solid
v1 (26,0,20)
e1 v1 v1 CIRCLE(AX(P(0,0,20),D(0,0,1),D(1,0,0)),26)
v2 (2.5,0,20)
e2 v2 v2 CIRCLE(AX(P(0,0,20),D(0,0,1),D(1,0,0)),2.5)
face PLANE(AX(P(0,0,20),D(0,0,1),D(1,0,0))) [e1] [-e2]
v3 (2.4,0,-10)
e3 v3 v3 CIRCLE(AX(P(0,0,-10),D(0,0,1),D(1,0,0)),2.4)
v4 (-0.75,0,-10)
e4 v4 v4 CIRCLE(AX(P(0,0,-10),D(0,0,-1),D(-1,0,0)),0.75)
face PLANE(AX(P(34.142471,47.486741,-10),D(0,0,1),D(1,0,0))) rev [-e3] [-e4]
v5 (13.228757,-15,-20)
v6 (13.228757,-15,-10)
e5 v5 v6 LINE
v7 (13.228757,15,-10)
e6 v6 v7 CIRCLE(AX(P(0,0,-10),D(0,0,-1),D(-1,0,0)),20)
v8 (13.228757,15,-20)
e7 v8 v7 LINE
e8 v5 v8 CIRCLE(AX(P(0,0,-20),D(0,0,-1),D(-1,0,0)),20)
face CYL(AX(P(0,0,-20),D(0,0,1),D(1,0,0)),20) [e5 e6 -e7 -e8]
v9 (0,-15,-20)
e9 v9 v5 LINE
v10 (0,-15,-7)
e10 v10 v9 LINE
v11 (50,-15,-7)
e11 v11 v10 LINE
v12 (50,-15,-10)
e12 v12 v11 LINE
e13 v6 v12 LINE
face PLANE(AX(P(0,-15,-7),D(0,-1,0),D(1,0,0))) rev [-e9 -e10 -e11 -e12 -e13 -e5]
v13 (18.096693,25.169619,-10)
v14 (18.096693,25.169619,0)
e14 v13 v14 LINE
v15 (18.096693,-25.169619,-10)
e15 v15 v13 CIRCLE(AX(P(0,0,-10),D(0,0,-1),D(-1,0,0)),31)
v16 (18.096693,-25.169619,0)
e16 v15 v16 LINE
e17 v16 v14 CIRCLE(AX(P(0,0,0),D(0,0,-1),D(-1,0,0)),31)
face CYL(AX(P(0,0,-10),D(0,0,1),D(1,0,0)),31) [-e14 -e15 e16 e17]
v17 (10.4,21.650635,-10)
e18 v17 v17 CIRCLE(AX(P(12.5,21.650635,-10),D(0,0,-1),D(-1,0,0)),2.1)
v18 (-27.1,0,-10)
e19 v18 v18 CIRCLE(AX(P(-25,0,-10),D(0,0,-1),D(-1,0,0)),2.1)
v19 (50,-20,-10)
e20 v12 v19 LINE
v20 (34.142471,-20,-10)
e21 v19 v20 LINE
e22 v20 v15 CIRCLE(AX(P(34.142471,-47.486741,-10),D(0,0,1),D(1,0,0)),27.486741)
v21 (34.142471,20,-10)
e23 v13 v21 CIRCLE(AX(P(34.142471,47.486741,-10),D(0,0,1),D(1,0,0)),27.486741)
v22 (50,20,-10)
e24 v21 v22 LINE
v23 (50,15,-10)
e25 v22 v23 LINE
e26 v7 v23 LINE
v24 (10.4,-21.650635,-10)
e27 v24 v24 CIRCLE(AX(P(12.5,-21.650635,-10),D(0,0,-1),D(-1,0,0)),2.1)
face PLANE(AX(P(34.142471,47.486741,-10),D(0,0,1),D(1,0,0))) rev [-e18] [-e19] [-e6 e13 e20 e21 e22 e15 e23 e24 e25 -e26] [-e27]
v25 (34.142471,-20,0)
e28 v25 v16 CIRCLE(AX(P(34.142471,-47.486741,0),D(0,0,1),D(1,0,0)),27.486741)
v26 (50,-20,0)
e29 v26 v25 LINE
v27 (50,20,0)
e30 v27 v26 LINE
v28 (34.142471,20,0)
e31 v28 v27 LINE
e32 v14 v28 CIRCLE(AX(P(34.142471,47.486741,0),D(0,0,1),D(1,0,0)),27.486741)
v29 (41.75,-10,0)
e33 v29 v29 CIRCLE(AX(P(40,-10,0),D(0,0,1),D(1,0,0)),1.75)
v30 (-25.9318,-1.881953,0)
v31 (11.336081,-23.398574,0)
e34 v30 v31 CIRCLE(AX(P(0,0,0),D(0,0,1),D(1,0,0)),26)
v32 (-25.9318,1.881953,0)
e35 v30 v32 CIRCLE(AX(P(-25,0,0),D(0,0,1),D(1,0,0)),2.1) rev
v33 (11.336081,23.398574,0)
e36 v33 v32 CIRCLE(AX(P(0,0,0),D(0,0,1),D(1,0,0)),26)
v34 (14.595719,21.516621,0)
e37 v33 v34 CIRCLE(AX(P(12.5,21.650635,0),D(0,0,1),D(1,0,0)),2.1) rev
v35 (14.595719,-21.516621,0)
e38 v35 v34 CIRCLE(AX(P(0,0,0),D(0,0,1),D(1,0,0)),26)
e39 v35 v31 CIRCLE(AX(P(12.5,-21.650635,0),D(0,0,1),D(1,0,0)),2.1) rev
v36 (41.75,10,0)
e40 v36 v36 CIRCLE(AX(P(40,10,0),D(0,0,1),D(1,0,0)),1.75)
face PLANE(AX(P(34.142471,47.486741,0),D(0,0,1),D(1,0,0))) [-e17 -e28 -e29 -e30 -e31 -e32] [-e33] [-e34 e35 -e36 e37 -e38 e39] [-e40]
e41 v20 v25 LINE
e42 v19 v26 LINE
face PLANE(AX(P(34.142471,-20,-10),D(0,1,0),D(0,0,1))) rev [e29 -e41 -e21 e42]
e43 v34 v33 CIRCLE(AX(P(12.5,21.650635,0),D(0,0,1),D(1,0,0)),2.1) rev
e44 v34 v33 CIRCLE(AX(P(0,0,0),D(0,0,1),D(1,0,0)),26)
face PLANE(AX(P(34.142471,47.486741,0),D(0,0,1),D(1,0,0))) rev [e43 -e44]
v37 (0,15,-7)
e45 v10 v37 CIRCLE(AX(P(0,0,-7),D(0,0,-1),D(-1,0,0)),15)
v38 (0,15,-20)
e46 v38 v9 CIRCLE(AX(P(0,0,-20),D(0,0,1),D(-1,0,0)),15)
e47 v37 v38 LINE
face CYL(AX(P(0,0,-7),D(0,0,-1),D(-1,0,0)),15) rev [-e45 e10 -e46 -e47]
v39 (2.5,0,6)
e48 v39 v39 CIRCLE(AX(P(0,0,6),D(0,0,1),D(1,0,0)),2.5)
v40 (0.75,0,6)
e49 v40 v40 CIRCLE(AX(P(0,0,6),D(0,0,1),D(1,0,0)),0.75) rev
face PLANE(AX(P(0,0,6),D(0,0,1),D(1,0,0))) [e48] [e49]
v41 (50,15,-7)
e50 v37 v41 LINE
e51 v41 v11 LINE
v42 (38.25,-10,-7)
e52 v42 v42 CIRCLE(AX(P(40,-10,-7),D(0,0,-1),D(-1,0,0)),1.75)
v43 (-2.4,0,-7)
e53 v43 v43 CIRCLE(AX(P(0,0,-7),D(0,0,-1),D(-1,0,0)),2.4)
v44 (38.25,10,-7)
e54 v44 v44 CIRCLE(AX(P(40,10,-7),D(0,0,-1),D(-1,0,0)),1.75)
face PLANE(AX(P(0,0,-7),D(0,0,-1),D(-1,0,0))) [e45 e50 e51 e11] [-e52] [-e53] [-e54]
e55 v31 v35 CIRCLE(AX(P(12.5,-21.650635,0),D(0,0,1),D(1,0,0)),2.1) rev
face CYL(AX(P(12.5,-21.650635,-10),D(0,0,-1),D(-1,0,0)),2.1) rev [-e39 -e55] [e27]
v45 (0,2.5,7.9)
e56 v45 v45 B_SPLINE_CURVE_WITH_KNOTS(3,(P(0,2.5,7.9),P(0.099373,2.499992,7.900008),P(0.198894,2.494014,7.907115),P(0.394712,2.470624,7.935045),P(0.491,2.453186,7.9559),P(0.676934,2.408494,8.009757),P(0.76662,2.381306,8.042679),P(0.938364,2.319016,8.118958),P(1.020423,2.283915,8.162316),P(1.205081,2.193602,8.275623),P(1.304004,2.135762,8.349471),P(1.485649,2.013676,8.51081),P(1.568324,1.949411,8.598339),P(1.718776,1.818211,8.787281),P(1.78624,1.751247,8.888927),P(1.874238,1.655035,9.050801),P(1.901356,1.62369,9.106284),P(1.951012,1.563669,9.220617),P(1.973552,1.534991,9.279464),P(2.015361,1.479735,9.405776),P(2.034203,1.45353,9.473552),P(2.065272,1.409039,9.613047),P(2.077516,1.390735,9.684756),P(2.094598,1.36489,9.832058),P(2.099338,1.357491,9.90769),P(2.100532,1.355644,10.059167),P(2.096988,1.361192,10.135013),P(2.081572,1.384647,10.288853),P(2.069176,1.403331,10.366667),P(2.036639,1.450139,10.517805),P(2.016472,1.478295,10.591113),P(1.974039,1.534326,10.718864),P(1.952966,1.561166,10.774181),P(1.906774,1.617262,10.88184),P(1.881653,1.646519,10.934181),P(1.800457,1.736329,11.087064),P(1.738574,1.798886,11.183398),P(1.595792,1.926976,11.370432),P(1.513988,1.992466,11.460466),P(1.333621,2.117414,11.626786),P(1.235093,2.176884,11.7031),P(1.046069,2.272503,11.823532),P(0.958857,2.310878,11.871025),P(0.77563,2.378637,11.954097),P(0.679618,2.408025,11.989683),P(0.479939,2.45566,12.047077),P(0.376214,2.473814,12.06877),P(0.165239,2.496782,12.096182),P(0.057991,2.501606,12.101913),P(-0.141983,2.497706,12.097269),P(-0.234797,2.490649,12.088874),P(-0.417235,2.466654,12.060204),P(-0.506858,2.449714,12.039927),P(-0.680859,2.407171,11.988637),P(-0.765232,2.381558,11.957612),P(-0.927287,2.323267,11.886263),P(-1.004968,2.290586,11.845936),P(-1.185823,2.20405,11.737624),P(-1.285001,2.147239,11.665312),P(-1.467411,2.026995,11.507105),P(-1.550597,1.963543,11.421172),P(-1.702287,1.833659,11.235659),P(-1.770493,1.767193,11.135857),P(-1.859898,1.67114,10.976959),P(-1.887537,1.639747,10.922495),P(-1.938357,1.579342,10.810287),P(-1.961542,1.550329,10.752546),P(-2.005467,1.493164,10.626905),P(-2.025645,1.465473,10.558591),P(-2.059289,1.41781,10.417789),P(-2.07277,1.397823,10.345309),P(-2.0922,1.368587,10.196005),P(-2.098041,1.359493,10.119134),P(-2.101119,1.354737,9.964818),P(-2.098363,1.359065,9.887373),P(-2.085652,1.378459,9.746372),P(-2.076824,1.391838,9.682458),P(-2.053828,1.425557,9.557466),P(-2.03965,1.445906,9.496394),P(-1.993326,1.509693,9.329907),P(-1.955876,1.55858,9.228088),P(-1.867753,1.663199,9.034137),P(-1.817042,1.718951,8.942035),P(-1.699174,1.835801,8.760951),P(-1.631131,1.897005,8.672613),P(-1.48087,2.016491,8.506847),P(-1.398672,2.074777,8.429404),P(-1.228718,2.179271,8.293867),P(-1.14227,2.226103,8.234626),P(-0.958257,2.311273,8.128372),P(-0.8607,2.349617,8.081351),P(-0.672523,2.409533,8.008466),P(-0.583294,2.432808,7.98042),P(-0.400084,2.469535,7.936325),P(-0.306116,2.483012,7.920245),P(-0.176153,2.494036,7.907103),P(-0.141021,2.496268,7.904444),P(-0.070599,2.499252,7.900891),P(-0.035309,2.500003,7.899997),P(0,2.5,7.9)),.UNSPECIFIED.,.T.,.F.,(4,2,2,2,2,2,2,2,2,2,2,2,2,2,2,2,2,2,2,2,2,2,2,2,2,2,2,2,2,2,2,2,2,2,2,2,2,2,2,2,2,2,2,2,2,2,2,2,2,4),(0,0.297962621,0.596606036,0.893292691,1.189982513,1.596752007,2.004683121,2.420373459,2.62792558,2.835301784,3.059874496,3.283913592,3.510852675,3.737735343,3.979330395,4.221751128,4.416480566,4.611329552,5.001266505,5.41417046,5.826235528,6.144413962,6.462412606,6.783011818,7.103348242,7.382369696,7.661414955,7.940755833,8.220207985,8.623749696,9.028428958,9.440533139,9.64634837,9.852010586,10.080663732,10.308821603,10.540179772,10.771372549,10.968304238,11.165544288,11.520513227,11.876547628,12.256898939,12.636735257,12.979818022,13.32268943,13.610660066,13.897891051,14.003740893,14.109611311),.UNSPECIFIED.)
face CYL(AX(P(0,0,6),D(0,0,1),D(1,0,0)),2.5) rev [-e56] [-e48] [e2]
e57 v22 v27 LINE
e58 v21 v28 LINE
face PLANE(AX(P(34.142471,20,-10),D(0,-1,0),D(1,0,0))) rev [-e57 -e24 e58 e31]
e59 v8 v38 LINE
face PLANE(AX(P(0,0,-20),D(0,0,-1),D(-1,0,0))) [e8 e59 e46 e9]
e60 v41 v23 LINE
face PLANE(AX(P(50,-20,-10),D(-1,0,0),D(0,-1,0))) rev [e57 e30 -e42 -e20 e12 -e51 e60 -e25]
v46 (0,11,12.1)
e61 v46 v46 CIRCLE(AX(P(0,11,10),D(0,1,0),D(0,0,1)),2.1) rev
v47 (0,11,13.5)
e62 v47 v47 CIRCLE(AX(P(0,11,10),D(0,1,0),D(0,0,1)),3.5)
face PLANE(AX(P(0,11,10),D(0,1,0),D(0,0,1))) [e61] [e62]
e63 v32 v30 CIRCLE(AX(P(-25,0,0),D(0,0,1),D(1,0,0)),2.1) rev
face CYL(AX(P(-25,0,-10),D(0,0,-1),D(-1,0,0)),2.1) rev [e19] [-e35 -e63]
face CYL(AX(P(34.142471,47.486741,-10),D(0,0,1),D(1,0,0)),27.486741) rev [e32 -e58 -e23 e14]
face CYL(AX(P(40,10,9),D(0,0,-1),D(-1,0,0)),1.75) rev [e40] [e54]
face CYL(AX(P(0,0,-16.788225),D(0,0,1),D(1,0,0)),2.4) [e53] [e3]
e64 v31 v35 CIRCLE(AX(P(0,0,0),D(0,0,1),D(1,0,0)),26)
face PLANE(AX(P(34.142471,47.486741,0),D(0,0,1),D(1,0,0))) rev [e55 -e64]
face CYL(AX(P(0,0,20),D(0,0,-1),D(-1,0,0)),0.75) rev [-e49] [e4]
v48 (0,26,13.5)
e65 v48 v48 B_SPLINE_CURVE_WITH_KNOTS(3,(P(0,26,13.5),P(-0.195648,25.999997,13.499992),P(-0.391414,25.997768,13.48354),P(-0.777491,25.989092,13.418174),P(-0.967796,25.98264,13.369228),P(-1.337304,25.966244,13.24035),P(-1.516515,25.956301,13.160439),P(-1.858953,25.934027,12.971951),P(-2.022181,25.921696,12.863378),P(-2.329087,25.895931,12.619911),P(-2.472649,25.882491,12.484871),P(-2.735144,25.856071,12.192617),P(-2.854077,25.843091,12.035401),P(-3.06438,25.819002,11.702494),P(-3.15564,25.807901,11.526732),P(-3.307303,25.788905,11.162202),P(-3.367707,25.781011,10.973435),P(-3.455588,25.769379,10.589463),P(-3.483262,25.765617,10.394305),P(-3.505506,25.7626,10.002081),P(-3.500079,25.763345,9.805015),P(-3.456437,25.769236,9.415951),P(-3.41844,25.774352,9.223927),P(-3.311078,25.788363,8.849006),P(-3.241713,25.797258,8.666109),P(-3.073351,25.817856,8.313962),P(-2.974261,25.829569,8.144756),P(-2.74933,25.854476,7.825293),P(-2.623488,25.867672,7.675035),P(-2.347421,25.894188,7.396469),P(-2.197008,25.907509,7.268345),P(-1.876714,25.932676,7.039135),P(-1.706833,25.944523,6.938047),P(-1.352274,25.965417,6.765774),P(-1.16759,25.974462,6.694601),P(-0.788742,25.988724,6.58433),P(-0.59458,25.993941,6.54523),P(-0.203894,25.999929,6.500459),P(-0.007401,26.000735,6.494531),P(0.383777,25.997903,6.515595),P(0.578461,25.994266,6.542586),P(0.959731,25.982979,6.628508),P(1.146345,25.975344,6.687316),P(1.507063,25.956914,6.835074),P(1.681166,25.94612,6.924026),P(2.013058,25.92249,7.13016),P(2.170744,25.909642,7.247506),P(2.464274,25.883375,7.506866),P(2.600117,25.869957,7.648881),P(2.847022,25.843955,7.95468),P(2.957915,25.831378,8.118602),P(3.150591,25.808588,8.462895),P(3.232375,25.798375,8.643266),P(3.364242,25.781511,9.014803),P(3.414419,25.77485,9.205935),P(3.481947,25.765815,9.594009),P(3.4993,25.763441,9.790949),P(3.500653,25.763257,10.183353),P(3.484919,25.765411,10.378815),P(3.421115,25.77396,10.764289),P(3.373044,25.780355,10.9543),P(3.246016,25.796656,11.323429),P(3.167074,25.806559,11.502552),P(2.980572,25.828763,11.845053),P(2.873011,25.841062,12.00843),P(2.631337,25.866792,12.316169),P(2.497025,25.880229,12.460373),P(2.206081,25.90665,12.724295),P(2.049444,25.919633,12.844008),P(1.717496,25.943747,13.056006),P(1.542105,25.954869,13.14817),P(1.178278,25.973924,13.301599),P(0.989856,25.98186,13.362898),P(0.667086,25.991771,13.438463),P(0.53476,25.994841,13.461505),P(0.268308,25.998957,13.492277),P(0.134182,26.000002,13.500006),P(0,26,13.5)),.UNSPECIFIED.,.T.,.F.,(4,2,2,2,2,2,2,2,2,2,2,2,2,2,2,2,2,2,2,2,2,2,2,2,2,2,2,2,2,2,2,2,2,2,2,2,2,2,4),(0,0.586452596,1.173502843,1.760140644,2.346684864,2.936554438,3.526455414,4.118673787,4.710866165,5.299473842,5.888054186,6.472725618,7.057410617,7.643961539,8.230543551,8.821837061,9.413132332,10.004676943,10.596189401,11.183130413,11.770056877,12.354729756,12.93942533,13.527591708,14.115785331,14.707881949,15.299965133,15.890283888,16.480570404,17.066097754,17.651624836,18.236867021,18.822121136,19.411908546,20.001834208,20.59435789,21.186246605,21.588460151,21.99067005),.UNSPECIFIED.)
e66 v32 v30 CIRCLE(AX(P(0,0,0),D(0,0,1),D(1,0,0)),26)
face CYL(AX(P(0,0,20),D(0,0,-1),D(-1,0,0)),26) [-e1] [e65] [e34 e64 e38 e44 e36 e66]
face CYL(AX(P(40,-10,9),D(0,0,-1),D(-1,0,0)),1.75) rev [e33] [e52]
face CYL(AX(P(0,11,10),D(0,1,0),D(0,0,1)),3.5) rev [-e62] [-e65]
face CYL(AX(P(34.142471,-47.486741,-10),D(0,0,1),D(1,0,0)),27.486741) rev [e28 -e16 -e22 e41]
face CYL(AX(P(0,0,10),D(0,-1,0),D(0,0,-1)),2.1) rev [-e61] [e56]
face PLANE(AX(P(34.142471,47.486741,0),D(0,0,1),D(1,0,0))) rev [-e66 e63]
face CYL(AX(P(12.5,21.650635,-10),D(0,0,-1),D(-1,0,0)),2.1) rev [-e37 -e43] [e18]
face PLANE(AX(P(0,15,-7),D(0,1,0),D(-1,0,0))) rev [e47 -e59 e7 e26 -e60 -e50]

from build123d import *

# Parameters (mm, degrees)
SKETCH1_R                     = 26
BOSS_EXTRUDE1_DEPTH           = 20
SKETCH2_W                     = 2.1
SKETCH2_H                     = 26
SKETCH4_R                     = 3.5
CUT_EXTRUDE1_DEPTH            = 15
BOSS_EXTRUDE2_DEPTH           = 10
CUT_EXTRUDE2_DEPTH            = 3
SKETCH7_R                     = 2.4
BOSS_EXTRUDE3_DEPTH           = 3
SKETCH8_R                     = 0.75
CUT_EXTRUDE3_DEPTH            = 67.03786797
SKETCH9_R                     = 2.5
CUT_EXTRUDE4_DEPTH            = 14
SKETCH10_R                    = 1.75
CUT_EXTRUDE5_DEPTH            = 16
BOSS_EXTRUDE4_START           = 10
BOSS_EXTRUDE4_DEPTH           = 10
M5X0_8_START                  = -10
M5X0_8_TAPPED_HOLE2_OUTLINE_R = 2.1
M5X0_8_TAPPED_HOLE2_DEPTH     = 10
CIRPATTERN1_COUNT             = 3


# Read off the part's stored shape, not the designer's step: M5x0.8 Tapped Hole2
with BuildPart() as part:
    # Sketch1 → Boss-Extrude1 (new body)
    with BuildSketch(Plane.XY):
        Circle(SKETCH1_R)
    extrude(amount=BOSS_EXTRUDE1_DEPTH)

    # Sketch2 → M5x0.8 Tapped Hole1 (revolve, cut)
    with BuildSketch(Plane(origin=(0, 0, 10), x_dir=(0, 0, -1), z_dir=(1, 0, 0))):
        with Locations((1.05, 13)):
            Rectangle(SKETCH2_W, SKETCH2_H)
    revolve(axis=Axis((0, -6.35, 10), (0, 1, 0)), mode=Mode.SUBTRACT)

    # Sketch4 → Cut-Extrude1 (cut)
    with BuildSketch(Plane(origin=(0, 26, 0), x_dir=(-1, 0, 0), z_dir=(0, 1, 0))):
        with Locations(Location((0, 10, 0), (0, 0, 90))):
            Circle(SKETCH4_R)
    extrude(amount=-CUT_EXTRUDE1_DEPTH, mode=Mode.SUBTRACT)

    # Sketch5 → Boss-Extrude2 (add)
    with BuildSketch(Plane(origin=(0, 0, 0), x_dir=(-1, 0, 0), z_dir=(0, 0, -1))):
        with BuildLine():
            Line((-34.142470626, -20), (-50, -20))
            Line((-50, -20), (-50, 20))
            Line((-50, 20), (-34.142470626, 20))
            ThreePointArc((-34.142470626, 20), (-25.713473942, 21.324307139), (-18.096692901, 25.16961871))
            ThreePointArc((-18.096692901, 25.16961871), (31, 0), (-18.096692901, -25.16961871))
            ThreePointArc((-18.096692901, -25.16961871), (-25.713473942, -21.324307139), (-34.142470626, -20))
        make_face()
    extrude(amount=BOSS_EXTRUDE2_DEPTH)

    # Sketch6 → Cut-Extrude2 (cut)
    with BuildSketch(Plane(origin=(0, 0, -10), x_dir=(-1, 0, 0), z_dir=(0, 0, -1))):
        with BuildLine():
            Line((0, -15), (-80, -15))
            ThreePointArc((-80, -15), (-95, 0), (-80, 15))
            Line((-80, 15), (0, 15))
            ThreePointArc((0, 15), (15, 0), (0, -15))
        make_face()
    extrude(amount=-CUT_EXTRUDE2_DEPTH, mode=Mode.SUBTRACT)

    # Sketch7 → Boss-Extrude3 (add)
    with BuildSketch(Plane(origin=(0, 0, -7), x_dir=(-1, 0, 0), z_dir=(0, 0, -1))):
        with Locations(Location((0, 0, 0), (0, 0, 180))):
            Circle(SKETCH7_R)
    extrude(amount=BOSS_EXTRUDE3_DEPTH)

    # Sketch8 → Cut-Extrude3 (cut, through all)
    with BuildSketch(Plane(origin=(0, 0, -10), x_dir=(-1, 0, 0), z_dir=(0, 0, -1))):
        Circle(SKETCH8_R)
    extrude(amount=-CUT_EXTRUDE3_DEPTH, mode=Mode.SUBTRACT)

    # Sketch9 → Cut-Extrude4 (cut)
    with BuildSketch(Plane.XY.offset(20)):
        Circle(SKETCH9_R)
    extrude(amount=-CUT_EXTRUDE4_DEPTH, mode=Mode.SUBTRACT)

    # Sketch10 → Cut-Extrude5 (cut)
    with BuildSketch(Plane(origin=(0, 0, -7), x_dir=(-1, 0, 0), z_dir=(0, 0, -1))):
        with Locations((-40, -10)):
            Circle(SKETCH10_R)
        with Locations((-40, 10)):
            Circle(SKETCH10_R)
    extrude(amount=-CUT_EXTRUDE5_DEPTH, mode=Mode.SUBTRACT)

    # Sketch11 → Boss-Extrude4 (add)
    with BuildSketch(Plane(origin=(0, 0, -10), x_dir=(-1, 0, 0), z_dir=(0, 0, -1)).offset(BOSS_EXTRUDE4_START)):
        with BuildLine():
            Line((0, 15), (-13.228756555, 15))
            ThreePointArc((-13.228756555, 15), (20, 0), (-13.228756555, -15))
            Line((-13.228756555, -15), (0, -15))
            ThreePointArc((0, -15), (15, 0), (0, 15))
        make_face()
    extrude(amount=-BOSS_EXTRUDE4_DEPTH)

    # M5x0.8 Tapped Hole2 outline → M5x0.8 Tapped Hole2 (cut)
    with BuildSketch(Plane.XY.offset(M5X0_8_START)):
        with Locations((-25, 0)):
            Circle(M5X0_8_TAPPED_HOLE2_OUTLINE_R)
    m5x0_8_tapped_hole2 = extrude(amount=M5X0_8_TAPPED_HOLE2_DEPTH, mode=Mode.SUBTRACT)

    # CirPattern1: M5x0.8 Tapped Hole2 ×3 about axis
    cirpattern1_axis = Axis((0, 0, 0), (0, 0, 1))
    for i in range(1, CIRPATTERN1_COUNT):
        add(m5x0_8_tapped_hole2.rotate(cirpattern1_axis, i * 360 / CIRPATTERN1_COUNT), mode=Mode.SUBTRACT)


solid = part.part
